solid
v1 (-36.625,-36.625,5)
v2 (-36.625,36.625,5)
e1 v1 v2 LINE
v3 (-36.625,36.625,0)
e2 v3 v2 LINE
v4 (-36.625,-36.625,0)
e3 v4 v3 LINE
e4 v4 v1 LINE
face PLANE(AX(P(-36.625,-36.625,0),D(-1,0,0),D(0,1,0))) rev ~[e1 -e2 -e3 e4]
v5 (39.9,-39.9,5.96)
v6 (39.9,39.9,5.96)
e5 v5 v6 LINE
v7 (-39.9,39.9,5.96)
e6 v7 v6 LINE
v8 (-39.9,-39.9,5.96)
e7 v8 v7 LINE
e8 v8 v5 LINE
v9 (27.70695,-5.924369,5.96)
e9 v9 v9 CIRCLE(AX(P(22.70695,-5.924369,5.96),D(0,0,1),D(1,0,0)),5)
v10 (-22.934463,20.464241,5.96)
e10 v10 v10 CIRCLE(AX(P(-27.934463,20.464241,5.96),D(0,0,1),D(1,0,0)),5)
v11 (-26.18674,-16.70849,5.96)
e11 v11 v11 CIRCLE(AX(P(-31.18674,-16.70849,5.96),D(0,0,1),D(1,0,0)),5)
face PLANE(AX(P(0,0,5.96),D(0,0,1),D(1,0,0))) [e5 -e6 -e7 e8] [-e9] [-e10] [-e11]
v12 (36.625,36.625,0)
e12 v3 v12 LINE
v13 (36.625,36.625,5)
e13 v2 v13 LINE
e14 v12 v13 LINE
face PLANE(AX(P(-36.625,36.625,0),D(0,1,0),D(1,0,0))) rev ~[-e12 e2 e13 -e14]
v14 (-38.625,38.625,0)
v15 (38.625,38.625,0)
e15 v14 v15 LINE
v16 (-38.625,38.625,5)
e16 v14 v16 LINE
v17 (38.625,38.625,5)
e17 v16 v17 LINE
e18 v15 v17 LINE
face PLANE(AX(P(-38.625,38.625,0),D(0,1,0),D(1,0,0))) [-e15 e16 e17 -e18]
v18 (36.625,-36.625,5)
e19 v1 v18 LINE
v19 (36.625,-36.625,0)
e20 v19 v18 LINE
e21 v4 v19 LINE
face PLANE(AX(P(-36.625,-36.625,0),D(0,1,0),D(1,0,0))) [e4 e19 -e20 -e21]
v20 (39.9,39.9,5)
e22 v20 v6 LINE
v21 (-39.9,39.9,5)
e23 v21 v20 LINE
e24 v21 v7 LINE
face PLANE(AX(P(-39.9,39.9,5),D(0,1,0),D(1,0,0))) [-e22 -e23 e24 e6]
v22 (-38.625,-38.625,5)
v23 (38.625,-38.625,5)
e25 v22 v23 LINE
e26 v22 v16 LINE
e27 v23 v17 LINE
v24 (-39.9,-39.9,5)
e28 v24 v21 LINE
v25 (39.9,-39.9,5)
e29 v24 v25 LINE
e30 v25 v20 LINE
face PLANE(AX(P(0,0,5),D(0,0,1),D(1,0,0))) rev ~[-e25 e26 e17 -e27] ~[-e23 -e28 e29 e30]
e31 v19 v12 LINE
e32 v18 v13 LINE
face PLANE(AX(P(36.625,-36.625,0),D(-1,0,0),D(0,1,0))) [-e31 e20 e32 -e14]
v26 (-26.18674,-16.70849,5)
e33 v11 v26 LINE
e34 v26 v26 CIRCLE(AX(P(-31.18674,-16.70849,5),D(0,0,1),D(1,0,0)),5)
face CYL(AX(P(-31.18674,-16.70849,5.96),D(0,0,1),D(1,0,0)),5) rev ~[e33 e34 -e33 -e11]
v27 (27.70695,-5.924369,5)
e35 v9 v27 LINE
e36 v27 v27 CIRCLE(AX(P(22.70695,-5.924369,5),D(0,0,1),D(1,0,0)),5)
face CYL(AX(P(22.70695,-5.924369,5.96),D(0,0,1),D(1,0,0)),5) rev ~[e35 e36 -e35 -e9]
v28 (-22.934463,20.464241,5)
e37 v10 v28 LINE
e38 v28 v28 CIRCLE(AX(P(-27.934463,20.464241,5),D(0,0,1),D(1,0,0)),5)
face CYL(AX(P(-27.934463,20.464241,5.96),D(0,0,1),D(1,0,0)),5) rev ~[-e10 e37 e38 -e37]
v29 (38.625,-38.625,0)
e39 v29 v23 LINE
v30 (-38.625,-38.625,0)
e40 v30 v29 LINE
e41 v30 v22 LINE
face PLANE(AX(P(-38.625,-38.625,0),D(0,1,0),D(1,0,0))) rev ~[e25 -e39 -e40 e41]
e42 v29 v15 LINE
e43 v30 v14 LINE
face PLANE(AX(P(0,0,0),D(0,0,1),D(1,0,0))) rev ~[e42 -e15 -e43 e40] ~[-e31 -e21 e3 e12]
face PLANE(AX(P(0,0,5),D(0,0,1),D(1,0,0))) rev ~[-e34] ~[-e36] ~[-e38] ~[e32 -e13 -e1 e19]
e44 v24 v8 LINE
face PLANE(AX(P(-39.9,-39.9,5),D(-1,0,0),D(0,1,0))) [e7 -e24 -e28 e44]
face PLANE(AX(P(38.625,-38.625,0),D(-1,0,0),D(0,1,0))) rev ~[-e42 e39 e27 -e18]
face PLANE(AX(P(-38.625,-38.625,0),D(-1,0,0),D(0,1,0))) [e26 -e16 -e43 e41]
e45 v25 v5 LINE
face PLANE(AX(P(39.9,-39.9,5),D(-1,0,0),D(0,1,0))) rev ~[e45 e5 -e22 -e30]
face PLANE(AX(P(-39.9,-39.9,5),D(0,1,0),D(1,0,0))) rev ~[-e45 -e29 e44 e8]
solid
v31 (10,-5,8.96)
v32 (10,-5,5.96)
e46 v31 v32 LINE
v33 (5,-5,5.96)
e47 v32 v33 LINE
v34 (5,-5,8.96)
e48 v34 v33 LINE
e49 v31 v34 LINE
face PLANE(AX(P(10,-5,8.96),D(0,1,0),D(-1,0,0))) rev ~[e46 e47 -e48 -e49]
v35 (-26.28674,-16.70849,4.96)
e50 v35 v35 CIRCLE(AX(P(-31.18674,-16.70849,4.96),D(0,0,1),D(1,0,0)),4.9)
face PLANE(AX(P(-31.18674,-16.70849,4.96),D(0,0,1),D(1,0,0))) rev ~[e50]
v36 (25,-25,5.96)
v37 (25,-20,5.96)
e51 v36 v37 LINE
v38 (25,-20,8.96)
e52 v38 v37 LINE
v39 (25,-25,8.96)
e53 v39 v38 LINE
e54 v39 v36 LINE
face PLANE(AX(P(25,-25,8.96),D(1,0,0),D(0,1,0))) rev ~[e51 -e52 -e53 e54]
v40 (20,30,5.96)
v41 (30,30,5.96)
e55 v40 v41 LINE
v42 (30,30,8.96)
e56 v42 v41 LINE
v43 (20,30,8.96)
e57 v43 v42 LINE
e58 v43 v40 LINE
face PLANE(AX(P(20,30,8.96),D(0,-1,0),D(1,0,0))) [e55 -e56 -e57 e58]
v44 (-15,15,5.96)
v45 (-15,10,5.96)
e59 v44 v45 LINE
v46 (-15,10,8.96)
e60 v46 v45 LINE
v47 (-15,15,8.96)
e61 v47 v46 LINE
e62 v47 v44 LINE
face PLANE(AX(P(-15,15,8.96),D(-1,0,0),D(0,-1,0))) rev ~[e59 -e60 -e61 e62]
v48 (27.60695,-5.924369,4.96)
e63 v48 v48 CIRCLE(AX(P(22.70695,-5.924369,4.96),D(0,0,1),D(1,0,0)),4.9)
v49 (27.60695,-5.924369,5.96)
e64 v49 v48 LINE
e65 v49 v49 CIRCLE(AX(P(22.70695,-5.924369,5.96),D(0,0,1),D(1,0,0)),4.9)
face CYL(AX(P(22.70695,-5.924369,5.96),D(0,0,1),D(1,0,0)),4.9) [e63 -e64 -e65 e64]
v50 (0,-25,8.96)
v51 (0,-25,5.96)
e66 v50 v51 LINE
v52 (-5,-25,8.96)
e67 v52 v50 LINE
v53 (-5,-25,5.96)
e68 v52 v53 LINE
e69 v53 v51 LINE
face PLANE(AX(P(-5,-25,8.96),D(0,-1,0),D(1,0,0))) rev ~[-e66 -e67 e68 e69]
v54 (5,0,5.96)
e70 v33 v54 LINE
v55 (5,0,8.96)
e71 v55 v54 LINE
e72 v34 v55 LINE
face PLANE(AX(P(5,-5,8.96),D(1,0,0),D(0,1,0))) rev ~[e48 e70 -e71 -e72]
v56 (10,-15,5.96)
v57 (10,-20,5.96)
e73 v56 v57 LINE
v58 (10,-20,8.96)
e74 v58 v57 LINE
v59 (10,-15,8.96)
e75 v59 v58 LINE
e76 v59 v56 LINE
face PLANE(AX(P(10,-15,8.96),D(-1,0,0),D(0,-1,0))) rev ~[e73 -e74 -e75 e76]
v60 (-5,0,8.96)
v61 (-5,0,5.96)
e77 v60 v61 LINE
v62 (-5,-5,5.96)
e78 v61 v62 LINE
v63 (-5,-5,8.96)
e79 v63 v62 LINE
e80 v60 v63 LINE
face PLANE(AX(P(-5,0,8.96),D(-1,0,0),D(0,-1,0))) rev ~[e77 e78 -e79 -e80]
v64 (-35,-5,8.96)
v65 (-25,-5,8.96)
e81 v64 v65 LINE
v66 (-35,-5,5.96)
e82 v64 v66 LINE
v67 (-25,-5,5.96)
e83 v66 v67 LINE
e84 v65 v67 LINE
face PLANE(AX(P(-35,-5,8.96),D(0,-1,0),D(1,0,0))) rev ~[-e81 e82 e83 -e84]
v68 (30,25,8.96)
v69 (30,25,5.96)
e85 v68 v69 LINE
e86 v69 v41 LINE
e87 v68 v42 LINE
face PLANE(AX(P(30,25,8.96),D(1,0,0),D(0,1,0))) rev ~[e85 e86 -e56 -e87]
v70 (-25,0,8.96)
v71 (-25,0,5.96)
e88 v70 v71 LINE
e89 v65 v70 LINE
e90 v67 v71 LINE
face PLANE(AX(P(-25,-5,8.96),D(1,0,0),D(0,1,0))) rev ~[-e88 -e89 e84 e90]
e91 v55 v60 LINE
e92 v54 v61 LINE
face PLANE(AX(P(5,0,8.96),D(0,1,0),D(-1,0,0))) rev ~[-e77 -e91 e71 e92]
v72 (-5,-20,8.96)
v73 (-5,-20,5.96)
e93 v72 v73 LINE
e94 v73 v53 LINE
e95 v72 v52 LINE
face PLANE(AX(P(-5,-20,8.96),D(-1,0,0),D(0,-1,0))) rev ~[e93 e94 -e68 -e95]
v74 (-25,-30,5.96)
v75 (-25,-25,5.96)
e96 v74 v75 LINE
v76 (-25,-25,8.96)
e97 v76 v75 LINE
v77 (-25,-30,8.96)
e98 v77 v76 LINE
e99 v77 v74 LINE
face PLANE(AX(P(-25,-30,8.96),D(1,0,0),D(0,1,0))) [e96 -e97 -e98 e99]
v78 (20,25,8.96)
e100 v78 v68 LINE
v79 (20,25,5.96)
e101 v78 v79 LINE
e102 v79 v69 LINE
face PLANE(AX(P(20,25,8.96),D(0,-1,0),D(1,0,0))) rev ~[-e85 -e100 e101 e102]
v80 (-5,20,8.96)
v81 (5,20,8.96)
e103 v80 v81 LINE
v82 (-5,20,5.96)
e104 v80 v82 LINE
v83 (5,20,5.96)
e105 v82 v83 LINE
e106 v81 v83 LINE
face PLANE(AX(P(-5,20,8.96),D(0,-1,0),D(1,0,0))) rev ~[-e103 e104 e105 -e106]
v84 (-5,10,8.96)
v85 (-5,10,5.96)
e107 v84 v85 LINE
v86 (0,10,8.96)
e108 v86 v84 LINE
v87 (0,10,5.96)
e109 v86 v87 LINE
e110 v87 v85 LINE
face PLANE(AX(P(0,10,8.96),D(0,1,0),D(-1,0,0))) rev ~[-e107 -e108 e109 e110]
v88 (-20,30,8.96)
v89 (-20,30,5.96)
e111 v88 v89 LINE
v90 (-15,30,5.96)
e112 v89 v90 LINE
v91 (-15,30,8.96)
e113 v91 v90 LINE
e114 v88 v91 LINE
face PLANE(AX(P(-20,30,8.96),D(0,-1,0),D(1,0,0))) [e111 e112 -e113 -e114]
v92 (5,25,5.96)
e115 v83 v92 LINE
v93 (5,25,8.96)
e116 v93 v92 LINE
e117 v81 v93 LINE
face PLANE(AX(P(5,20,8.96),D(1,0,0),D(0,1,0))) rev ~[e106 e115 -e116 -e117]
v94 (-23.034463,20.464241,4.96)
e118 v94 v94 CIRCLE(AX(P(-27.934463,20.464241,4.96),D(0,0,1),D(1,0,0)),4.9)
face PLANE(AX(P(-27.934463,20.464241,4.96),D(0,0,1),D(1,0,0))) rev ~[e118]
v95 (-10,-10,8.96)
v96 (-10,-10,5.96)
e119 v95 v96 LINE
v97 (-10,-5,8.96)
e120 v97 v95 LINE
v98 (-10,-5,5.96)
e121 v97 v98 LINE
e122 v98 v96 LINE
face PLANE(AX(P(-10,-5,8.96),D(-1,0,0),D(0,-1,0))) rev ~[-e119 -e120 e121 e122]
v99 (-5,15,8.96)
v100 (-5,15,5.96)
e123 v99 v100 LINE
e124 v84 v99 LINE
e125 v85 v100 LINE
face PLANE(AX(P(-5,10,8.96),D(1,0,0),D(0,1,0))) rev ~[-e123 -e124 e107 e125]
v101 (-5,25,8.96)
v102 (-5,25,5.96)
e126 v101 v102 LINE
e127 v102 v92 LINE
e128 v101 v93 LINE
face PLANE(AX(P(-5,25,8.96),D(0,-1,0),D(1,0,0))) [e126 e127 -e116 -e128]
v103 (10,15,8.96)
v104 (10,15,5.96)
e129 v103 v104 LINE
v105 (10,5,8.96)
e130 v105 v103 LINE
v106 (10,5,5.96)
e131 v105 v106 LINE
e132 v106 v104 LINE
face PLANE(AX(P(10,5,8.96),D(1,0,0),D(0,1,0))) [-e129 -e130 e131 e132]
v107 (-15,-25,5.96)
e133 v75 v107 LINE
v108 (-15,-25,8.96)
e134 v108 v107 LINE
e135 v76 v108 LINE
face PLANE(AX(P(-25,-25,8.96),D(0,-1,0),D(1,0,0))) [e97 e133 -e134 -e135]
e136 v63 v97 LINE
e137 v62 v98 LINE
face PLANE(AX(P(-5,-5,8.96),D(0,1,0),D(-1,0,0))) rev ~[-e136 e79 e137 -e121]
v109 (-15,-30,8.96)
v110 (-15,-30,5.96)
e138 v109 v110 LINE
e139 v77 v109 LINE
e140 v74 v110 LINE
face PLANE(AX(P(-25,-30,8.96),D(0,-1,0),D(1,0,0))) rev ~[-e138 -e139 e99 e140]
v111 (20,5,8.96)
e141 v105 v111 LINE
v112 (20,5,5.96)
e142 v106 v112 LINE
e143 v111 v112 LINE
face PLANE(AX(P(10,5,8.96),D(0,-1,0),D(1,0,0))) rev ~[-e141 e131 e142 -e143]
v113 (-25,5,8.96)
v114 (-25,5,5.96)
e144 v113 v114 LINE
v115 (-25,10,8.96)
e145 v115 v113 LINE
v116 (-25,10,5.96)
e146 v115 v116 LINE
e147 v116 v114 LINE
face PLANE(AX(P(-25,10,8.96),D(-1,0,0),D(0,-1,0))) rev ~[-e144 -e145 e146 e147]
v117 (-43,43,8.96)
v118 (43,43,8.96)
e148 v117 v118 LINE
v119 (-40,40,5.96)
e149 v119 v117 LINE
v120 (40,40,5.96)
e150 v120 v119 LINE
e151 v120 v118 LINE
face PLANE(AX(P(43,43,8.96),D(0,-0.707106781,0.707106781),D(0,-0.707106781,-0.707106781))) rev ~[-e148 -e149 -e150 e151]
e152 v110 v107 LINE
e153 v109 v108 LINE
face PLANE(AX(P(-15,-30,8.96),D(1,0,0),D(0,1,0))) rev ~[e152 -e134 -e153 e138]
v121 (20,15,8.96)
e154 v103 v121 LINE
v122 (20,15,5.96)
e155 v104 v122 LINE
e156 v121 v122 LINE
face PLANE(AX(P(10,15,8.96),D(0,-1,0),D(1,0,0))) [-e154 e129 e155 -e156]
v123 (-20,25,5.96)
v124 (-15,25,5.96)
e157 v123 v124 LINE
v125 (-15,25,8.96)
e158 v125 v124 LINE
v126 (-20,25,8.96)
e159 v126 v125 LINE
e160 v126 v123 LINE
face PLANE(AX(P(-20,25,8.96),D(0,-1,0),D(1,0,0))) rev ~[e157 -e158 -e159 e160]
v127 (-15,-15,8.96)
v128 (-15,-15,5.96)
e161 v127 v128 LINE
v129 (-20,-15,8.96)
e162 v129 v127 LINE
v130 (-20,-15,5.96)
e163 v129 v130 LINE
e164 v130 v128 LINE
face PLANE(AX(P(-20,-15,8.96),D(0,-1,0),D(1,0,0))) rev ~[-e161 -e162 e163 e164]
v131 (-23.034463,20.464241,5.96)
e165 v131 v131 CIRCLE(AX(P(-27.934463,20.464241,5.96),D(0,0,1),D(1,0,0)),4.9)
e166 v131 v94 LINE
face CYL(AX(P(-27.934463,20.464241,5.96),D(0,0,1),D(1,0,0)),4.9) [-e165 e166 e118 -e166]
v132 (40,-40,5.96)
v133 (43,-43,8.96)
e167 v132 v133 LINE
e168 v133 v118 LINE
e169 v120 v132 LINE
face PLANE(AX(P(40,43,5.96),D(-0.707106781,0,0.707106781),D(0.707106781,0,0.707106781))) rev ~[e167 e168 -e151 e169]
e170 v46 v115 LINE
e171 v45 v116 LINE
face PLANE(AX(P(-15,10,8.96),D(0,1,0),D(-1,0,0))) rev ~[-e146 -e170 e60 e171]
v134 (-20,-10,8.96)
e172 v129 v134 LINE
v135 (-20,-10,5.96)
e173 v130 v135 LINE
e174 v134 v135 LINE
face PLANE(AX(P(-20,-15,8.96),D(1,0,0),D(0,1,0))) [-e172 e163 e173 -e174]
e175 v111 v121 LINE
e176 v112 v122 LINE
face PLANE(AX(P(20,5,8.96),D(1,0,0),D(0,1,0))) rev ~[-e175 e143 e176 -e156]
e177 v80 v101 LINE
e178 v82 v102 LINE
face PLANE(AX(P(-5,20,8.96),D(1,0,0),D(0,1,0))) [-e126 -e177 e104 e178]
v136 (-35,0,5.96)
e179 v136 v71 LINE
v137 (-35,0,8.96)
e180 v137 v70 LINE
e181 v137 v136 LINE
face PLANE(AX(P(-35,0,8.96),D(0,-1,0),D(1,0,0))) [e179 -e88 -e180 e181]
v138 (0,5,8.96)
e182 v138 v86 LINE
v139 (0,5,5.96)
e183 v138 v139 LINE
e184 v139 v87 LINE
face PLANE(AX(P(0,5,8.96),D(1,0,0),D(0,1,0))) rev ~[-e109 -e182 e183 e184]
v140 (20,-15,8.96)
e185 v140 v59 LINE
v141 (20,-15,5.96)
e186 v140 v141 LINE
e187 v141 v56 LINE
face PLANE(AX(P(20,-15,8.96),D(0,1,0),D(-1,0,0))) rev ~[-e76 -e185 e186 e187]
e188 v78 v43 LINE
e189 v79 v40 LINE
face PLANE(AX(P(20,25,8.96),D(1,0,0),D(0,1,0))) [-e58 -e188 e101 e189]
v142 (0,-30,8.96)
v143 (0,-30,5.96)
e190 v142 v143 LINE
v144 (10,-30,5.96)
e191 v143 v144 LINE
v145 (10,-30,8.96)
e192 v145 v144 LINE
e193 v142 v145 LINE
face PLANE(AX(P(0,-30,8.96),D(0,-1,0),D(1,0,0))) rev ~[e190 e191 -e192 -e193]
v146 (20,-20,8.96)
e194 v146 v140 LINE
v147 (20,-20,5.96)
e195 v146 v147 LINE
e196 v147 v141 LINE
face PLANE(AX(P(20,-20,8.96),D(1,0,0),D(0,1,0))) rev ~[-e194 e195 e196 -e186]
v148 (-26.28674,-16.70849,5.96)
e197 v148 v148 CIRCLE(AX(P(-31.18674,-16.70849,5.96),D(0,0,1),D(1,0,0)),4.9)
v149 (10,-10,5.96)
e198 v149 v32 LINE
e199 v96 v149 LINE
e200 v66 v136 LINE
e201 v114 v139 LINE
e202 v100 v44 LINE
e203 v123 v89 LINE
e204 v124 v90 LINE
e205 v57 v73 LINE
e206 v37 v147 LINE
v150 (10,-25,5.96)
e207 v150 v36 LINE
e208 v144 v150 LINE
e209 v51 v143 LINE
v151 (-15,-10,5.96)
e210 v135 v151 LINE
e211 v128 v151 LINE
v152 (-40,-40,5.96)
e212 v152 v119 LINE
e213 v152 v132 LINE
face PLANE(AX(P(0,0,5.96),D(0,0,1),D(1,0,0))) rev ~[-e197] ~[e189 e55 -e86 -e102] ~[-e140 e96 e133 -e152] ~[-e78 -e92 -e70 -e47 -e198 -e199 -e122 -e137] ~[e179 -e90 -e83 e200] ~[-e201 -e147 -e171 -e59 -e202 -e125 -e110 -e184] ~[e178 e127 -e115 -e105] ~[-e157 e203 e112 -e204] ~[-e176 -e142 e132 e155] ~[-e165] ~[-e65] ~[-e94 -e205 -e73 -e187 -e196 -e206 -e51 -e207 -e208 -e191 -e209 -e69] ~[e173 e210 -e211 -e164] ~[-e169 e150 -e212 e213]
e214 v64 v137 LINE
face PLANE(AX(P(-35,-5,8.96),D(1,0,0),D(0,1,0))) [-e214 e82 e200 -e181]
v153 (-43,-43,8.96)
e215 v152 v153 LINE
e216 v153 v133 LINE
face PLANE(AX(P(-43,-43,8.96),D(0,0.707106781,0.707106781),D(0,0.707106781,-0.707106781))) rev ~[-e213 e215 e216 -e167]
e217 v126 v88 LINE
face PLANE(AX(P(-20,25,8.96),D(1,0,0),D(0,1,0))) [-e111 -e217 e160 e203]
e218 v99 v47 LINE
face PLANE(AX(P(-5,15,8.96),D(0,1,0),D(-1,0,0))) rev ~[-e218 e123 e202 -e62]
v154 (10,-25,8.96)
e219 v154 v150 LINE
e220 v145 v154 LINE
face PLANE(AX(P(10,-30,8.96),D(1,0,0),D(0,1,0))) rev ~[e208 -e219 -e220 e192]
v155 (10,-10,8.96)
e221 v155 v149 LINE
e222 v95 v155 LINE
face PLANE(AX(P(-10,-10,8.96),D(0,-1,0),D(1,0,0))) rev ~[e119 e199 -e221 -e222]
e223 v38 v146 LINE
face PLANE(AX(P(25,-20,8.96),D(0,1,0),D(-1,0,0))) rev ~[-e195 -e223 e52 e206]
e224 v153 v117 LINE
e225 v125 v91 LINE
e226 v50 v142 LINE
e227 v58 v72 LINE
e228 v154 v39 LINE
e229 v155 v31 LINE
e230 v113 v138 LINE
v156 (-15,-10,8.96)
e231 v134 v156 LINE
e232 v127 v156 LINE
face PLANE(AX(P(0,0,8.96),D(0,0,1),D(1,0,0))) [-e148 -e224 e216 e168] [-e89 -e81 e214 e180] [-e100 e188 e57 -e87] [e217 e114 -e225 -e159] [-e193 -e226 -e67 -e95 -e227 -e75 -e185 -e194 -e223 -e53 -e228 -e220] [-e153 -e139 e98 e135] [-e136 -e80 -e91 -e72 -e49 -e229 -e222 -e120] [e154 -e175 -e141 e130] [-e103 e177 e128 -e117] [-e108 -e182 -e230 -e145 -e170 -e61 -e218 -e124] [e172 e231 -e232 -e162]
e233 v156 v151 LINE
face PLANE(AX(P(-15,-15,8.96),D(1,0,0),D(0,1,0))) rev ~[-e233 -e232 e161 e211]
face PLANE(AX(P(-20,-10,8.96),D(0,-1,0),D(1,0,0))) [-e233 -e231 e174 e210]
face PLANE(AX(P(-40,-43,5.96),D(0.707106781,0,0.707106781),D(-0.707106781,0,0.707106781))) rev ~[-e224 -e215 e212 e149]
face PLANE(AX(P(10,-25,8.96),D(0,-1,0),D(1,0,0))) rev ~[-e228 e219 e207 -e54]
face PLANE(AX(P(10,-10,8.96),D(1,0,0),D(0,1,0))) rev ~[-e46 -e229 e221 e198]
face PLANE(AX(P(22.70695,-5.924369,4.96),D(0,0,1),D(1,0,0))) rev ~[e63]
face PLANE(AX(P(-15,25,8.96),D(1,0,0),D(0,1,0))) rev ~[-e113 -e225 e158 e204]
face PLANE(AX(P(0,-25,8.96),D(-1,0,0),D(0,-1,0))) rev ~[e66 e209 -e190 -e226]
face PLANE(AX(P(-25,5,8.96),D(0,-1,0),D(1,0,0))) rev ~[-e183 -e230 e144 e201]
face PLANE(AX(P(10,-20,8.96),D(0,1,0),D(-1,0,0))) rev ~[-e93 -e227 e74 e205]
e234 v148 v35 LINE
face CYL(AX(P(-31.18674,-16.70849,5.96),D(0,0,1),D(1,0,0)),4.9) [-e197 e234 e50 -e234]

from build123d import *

# Parameters (mm, degrees)
F0_W      = 77.25
F0_H      = 77.25
F0_W_2    = 73.25
F0_H_2    = 73.25
F1_DEPTH  = 5
F2_W      = 79.8
F2_H      = 79.8
F2_W_2    = 77.25
F2_H_2    = 77.25
F2_W_3    = 73.25
F2_H_3    = 73.25
F3_DEPTH  = 0.96
F4_R      = 5
F5_DEPTH  = 5.96
F6_W      = 86
F6_H      = 86
F7_DEPTH  = 3
F8_R      = 4.9
F9_DEPTH  = 1
F10_W     = 10
F10_H     = 5
F10_W_2   = 5
F10_H_2   = 10
F11_DEPTH = 25
F20_DEPTH = 86
F21_DEPTH = 86
F22_DEPTH = 86.001
F23_REACH = 90.2436406871


with BuildPart() as f1:
    # F0 (on Top) → F1 (new body)
    with BuildSketch(Plane.XY):
        Rectangle(F0_W, F0_H)
        Rectangle(F0_W_2, F0_H_2, mode=Mode.SUBTRACT)
    extrude(amount=F1_DEPTH)

    # F2 (on face) → F3 (join)
    with BuildSketch(Plane.XY.offset(5)):
        Rectangle(F2_W, F2_H)
        Rectangle(F2_W_2, F2_H_2, mode=Mode.SUBTRACT)
        Rectangle(F2_W_2, F2_H_2)
        Rectangle(F2_W_3, F2_H_3, mode=Mode.SUBTRACT)
        Rectangle(F2_W_3, F2_H_3)
    extrude(amount=F3_DEPTH)

    # F4 (on face) → F5 (cut, through all)
    with BuildSketch(Plane.XY.offset(5.96)):
        with Locations((-31.1867402621, -16.7084898855)):
            Circle(F4_R)
        with Locations((-27.9344634459, 20.4642405513)):
            Circle(F4_R)
        with Locations((22.7069496598, -5.9243687574)):
            Circle(F4_R)
    extrude(amount=-F5_DEPTH, mode=Mode.SUBTRACT)


with BuildPart() as f7:
    # F6 (on face) → F7 (new body)
    with BuildSketch(Plane.XY.offset(5.96)):
        Rectangle(F6_W, F6_H)
    extrude(amount=F7_DEPTH)

    # F8 (on face) → F9 (join)
    with BuildSketch(Plane.XY.offset(5.96)):
        with Locations((-31.1867402621, -16.7084898855)):
            Circle(F8_R)
        with Locations((22.7069496598, -5.9243687574)):
            Circle(F8_R)
        with Locations((-27.9344634459, 20.4642405513)):
            Circle(F8_R)
    extrude(amount=-F9_DEPTH)

    # F10 (on face) → F11 (cut)
    with BuildSketch(Plane.XY.offset(8.96)):
        with Locations((-20, -27.5)):
            Rectangle(F10_W, F10_H)
        Polygon((20, -15), (10, -15), (10, -20), (-5, -20), (-5, -25), (0, -25), (0, -30), (10, -30), (10, -25), (25, -25), (25, -20), (20, -20), align=None)
        Polygon((5, -5), (5, 0), (-5, 0), (-5, -5), (-10, -5), (-10, -10), (10, -10), (10, -5), align=None)
        with Locations((-17.5, -12.5)):
            Rectangle(F10_W_2, F10_H)
        with Locations((-30, -2.5)):
            Rectangle(F10_W, F10_H)
        with Locations((-17.5, 27.5)):
            Rectangle(F10_W_2, F10_H)
        with Locations((0, 22.5)):
            Rectangle(F10_W, F10_H)
        with Locations((15, 10)):
            Rectangle(F10_W, F10_H_2)
        with Locations((25, 27.5)):
            Rectangle(F10_W, F10_H)
        Polygon((-25, 5), (0, 5), (0, 10), (-5, 10), (-5, 15), (-15, 15), (-15, 10), (-25, 10), align=None)
    extrude(amount=-F11_DEPTH, mode=Mode.SUBTRACT)

    # F16 (on offset) → F20 (cut, through all)
    with BuildSketch(Plane.XZ.offset(43)):
        Polygon((-43, 8.96), (-43, 5.96), (-40, 5.96), align=None)
    extrude(amount=-F20_DEPTH, mode=Mode.SUBTRACT)

    # F17 (on offset) → F21 (cut, through all)
    with BuildSketch(Plane(origin=(-43, 0, 0), x_dir=(0, -1, 0), z_dir=(-1, 0, 0))):
        Polygon((43, 5.96), (43, 8.96), (40, 5.96), align=None)
    extrude(amount=-F21_DEPTH, mode=Mode.SUBTRACT)

    # F18 (on offset) → F22 (cut, through all)
    with BuildSketch(Plane(origin=(0, 43, 0), x_dir=(-1, 0, 0), z_dir=(0, 1, 0))):
        Polygon((-40, 5.96), (-43, 8.96), (-43, 5.96), align=None)
    extrude(amount=-F22_DEPTH, mode=Mode.SUBTRACT)

    f23_end = f7.faces().sort_by_distance((-41.5088757396, 0.7455621302, 7.4688757396))[0]
    # F19 (on offset) → F23 (cut, up to a face of the model that its end follows)
    with BuildSketch(Plane.YZ.offset(43)):
        Polygon((43, 5.96), (43, 8.96), (40, 5.96), align=None)
    f23_long = extrude(amount=-F23_REACH, mode=Mode.PRIVATE)
    add(split(f23_long, bisect_by=f23_end, keep=Keep.BOTTOM, mode=Mode.PRIVATE), mode=Mode.SUBTRACT)


solid = Compound([f1.part, f7.part])
